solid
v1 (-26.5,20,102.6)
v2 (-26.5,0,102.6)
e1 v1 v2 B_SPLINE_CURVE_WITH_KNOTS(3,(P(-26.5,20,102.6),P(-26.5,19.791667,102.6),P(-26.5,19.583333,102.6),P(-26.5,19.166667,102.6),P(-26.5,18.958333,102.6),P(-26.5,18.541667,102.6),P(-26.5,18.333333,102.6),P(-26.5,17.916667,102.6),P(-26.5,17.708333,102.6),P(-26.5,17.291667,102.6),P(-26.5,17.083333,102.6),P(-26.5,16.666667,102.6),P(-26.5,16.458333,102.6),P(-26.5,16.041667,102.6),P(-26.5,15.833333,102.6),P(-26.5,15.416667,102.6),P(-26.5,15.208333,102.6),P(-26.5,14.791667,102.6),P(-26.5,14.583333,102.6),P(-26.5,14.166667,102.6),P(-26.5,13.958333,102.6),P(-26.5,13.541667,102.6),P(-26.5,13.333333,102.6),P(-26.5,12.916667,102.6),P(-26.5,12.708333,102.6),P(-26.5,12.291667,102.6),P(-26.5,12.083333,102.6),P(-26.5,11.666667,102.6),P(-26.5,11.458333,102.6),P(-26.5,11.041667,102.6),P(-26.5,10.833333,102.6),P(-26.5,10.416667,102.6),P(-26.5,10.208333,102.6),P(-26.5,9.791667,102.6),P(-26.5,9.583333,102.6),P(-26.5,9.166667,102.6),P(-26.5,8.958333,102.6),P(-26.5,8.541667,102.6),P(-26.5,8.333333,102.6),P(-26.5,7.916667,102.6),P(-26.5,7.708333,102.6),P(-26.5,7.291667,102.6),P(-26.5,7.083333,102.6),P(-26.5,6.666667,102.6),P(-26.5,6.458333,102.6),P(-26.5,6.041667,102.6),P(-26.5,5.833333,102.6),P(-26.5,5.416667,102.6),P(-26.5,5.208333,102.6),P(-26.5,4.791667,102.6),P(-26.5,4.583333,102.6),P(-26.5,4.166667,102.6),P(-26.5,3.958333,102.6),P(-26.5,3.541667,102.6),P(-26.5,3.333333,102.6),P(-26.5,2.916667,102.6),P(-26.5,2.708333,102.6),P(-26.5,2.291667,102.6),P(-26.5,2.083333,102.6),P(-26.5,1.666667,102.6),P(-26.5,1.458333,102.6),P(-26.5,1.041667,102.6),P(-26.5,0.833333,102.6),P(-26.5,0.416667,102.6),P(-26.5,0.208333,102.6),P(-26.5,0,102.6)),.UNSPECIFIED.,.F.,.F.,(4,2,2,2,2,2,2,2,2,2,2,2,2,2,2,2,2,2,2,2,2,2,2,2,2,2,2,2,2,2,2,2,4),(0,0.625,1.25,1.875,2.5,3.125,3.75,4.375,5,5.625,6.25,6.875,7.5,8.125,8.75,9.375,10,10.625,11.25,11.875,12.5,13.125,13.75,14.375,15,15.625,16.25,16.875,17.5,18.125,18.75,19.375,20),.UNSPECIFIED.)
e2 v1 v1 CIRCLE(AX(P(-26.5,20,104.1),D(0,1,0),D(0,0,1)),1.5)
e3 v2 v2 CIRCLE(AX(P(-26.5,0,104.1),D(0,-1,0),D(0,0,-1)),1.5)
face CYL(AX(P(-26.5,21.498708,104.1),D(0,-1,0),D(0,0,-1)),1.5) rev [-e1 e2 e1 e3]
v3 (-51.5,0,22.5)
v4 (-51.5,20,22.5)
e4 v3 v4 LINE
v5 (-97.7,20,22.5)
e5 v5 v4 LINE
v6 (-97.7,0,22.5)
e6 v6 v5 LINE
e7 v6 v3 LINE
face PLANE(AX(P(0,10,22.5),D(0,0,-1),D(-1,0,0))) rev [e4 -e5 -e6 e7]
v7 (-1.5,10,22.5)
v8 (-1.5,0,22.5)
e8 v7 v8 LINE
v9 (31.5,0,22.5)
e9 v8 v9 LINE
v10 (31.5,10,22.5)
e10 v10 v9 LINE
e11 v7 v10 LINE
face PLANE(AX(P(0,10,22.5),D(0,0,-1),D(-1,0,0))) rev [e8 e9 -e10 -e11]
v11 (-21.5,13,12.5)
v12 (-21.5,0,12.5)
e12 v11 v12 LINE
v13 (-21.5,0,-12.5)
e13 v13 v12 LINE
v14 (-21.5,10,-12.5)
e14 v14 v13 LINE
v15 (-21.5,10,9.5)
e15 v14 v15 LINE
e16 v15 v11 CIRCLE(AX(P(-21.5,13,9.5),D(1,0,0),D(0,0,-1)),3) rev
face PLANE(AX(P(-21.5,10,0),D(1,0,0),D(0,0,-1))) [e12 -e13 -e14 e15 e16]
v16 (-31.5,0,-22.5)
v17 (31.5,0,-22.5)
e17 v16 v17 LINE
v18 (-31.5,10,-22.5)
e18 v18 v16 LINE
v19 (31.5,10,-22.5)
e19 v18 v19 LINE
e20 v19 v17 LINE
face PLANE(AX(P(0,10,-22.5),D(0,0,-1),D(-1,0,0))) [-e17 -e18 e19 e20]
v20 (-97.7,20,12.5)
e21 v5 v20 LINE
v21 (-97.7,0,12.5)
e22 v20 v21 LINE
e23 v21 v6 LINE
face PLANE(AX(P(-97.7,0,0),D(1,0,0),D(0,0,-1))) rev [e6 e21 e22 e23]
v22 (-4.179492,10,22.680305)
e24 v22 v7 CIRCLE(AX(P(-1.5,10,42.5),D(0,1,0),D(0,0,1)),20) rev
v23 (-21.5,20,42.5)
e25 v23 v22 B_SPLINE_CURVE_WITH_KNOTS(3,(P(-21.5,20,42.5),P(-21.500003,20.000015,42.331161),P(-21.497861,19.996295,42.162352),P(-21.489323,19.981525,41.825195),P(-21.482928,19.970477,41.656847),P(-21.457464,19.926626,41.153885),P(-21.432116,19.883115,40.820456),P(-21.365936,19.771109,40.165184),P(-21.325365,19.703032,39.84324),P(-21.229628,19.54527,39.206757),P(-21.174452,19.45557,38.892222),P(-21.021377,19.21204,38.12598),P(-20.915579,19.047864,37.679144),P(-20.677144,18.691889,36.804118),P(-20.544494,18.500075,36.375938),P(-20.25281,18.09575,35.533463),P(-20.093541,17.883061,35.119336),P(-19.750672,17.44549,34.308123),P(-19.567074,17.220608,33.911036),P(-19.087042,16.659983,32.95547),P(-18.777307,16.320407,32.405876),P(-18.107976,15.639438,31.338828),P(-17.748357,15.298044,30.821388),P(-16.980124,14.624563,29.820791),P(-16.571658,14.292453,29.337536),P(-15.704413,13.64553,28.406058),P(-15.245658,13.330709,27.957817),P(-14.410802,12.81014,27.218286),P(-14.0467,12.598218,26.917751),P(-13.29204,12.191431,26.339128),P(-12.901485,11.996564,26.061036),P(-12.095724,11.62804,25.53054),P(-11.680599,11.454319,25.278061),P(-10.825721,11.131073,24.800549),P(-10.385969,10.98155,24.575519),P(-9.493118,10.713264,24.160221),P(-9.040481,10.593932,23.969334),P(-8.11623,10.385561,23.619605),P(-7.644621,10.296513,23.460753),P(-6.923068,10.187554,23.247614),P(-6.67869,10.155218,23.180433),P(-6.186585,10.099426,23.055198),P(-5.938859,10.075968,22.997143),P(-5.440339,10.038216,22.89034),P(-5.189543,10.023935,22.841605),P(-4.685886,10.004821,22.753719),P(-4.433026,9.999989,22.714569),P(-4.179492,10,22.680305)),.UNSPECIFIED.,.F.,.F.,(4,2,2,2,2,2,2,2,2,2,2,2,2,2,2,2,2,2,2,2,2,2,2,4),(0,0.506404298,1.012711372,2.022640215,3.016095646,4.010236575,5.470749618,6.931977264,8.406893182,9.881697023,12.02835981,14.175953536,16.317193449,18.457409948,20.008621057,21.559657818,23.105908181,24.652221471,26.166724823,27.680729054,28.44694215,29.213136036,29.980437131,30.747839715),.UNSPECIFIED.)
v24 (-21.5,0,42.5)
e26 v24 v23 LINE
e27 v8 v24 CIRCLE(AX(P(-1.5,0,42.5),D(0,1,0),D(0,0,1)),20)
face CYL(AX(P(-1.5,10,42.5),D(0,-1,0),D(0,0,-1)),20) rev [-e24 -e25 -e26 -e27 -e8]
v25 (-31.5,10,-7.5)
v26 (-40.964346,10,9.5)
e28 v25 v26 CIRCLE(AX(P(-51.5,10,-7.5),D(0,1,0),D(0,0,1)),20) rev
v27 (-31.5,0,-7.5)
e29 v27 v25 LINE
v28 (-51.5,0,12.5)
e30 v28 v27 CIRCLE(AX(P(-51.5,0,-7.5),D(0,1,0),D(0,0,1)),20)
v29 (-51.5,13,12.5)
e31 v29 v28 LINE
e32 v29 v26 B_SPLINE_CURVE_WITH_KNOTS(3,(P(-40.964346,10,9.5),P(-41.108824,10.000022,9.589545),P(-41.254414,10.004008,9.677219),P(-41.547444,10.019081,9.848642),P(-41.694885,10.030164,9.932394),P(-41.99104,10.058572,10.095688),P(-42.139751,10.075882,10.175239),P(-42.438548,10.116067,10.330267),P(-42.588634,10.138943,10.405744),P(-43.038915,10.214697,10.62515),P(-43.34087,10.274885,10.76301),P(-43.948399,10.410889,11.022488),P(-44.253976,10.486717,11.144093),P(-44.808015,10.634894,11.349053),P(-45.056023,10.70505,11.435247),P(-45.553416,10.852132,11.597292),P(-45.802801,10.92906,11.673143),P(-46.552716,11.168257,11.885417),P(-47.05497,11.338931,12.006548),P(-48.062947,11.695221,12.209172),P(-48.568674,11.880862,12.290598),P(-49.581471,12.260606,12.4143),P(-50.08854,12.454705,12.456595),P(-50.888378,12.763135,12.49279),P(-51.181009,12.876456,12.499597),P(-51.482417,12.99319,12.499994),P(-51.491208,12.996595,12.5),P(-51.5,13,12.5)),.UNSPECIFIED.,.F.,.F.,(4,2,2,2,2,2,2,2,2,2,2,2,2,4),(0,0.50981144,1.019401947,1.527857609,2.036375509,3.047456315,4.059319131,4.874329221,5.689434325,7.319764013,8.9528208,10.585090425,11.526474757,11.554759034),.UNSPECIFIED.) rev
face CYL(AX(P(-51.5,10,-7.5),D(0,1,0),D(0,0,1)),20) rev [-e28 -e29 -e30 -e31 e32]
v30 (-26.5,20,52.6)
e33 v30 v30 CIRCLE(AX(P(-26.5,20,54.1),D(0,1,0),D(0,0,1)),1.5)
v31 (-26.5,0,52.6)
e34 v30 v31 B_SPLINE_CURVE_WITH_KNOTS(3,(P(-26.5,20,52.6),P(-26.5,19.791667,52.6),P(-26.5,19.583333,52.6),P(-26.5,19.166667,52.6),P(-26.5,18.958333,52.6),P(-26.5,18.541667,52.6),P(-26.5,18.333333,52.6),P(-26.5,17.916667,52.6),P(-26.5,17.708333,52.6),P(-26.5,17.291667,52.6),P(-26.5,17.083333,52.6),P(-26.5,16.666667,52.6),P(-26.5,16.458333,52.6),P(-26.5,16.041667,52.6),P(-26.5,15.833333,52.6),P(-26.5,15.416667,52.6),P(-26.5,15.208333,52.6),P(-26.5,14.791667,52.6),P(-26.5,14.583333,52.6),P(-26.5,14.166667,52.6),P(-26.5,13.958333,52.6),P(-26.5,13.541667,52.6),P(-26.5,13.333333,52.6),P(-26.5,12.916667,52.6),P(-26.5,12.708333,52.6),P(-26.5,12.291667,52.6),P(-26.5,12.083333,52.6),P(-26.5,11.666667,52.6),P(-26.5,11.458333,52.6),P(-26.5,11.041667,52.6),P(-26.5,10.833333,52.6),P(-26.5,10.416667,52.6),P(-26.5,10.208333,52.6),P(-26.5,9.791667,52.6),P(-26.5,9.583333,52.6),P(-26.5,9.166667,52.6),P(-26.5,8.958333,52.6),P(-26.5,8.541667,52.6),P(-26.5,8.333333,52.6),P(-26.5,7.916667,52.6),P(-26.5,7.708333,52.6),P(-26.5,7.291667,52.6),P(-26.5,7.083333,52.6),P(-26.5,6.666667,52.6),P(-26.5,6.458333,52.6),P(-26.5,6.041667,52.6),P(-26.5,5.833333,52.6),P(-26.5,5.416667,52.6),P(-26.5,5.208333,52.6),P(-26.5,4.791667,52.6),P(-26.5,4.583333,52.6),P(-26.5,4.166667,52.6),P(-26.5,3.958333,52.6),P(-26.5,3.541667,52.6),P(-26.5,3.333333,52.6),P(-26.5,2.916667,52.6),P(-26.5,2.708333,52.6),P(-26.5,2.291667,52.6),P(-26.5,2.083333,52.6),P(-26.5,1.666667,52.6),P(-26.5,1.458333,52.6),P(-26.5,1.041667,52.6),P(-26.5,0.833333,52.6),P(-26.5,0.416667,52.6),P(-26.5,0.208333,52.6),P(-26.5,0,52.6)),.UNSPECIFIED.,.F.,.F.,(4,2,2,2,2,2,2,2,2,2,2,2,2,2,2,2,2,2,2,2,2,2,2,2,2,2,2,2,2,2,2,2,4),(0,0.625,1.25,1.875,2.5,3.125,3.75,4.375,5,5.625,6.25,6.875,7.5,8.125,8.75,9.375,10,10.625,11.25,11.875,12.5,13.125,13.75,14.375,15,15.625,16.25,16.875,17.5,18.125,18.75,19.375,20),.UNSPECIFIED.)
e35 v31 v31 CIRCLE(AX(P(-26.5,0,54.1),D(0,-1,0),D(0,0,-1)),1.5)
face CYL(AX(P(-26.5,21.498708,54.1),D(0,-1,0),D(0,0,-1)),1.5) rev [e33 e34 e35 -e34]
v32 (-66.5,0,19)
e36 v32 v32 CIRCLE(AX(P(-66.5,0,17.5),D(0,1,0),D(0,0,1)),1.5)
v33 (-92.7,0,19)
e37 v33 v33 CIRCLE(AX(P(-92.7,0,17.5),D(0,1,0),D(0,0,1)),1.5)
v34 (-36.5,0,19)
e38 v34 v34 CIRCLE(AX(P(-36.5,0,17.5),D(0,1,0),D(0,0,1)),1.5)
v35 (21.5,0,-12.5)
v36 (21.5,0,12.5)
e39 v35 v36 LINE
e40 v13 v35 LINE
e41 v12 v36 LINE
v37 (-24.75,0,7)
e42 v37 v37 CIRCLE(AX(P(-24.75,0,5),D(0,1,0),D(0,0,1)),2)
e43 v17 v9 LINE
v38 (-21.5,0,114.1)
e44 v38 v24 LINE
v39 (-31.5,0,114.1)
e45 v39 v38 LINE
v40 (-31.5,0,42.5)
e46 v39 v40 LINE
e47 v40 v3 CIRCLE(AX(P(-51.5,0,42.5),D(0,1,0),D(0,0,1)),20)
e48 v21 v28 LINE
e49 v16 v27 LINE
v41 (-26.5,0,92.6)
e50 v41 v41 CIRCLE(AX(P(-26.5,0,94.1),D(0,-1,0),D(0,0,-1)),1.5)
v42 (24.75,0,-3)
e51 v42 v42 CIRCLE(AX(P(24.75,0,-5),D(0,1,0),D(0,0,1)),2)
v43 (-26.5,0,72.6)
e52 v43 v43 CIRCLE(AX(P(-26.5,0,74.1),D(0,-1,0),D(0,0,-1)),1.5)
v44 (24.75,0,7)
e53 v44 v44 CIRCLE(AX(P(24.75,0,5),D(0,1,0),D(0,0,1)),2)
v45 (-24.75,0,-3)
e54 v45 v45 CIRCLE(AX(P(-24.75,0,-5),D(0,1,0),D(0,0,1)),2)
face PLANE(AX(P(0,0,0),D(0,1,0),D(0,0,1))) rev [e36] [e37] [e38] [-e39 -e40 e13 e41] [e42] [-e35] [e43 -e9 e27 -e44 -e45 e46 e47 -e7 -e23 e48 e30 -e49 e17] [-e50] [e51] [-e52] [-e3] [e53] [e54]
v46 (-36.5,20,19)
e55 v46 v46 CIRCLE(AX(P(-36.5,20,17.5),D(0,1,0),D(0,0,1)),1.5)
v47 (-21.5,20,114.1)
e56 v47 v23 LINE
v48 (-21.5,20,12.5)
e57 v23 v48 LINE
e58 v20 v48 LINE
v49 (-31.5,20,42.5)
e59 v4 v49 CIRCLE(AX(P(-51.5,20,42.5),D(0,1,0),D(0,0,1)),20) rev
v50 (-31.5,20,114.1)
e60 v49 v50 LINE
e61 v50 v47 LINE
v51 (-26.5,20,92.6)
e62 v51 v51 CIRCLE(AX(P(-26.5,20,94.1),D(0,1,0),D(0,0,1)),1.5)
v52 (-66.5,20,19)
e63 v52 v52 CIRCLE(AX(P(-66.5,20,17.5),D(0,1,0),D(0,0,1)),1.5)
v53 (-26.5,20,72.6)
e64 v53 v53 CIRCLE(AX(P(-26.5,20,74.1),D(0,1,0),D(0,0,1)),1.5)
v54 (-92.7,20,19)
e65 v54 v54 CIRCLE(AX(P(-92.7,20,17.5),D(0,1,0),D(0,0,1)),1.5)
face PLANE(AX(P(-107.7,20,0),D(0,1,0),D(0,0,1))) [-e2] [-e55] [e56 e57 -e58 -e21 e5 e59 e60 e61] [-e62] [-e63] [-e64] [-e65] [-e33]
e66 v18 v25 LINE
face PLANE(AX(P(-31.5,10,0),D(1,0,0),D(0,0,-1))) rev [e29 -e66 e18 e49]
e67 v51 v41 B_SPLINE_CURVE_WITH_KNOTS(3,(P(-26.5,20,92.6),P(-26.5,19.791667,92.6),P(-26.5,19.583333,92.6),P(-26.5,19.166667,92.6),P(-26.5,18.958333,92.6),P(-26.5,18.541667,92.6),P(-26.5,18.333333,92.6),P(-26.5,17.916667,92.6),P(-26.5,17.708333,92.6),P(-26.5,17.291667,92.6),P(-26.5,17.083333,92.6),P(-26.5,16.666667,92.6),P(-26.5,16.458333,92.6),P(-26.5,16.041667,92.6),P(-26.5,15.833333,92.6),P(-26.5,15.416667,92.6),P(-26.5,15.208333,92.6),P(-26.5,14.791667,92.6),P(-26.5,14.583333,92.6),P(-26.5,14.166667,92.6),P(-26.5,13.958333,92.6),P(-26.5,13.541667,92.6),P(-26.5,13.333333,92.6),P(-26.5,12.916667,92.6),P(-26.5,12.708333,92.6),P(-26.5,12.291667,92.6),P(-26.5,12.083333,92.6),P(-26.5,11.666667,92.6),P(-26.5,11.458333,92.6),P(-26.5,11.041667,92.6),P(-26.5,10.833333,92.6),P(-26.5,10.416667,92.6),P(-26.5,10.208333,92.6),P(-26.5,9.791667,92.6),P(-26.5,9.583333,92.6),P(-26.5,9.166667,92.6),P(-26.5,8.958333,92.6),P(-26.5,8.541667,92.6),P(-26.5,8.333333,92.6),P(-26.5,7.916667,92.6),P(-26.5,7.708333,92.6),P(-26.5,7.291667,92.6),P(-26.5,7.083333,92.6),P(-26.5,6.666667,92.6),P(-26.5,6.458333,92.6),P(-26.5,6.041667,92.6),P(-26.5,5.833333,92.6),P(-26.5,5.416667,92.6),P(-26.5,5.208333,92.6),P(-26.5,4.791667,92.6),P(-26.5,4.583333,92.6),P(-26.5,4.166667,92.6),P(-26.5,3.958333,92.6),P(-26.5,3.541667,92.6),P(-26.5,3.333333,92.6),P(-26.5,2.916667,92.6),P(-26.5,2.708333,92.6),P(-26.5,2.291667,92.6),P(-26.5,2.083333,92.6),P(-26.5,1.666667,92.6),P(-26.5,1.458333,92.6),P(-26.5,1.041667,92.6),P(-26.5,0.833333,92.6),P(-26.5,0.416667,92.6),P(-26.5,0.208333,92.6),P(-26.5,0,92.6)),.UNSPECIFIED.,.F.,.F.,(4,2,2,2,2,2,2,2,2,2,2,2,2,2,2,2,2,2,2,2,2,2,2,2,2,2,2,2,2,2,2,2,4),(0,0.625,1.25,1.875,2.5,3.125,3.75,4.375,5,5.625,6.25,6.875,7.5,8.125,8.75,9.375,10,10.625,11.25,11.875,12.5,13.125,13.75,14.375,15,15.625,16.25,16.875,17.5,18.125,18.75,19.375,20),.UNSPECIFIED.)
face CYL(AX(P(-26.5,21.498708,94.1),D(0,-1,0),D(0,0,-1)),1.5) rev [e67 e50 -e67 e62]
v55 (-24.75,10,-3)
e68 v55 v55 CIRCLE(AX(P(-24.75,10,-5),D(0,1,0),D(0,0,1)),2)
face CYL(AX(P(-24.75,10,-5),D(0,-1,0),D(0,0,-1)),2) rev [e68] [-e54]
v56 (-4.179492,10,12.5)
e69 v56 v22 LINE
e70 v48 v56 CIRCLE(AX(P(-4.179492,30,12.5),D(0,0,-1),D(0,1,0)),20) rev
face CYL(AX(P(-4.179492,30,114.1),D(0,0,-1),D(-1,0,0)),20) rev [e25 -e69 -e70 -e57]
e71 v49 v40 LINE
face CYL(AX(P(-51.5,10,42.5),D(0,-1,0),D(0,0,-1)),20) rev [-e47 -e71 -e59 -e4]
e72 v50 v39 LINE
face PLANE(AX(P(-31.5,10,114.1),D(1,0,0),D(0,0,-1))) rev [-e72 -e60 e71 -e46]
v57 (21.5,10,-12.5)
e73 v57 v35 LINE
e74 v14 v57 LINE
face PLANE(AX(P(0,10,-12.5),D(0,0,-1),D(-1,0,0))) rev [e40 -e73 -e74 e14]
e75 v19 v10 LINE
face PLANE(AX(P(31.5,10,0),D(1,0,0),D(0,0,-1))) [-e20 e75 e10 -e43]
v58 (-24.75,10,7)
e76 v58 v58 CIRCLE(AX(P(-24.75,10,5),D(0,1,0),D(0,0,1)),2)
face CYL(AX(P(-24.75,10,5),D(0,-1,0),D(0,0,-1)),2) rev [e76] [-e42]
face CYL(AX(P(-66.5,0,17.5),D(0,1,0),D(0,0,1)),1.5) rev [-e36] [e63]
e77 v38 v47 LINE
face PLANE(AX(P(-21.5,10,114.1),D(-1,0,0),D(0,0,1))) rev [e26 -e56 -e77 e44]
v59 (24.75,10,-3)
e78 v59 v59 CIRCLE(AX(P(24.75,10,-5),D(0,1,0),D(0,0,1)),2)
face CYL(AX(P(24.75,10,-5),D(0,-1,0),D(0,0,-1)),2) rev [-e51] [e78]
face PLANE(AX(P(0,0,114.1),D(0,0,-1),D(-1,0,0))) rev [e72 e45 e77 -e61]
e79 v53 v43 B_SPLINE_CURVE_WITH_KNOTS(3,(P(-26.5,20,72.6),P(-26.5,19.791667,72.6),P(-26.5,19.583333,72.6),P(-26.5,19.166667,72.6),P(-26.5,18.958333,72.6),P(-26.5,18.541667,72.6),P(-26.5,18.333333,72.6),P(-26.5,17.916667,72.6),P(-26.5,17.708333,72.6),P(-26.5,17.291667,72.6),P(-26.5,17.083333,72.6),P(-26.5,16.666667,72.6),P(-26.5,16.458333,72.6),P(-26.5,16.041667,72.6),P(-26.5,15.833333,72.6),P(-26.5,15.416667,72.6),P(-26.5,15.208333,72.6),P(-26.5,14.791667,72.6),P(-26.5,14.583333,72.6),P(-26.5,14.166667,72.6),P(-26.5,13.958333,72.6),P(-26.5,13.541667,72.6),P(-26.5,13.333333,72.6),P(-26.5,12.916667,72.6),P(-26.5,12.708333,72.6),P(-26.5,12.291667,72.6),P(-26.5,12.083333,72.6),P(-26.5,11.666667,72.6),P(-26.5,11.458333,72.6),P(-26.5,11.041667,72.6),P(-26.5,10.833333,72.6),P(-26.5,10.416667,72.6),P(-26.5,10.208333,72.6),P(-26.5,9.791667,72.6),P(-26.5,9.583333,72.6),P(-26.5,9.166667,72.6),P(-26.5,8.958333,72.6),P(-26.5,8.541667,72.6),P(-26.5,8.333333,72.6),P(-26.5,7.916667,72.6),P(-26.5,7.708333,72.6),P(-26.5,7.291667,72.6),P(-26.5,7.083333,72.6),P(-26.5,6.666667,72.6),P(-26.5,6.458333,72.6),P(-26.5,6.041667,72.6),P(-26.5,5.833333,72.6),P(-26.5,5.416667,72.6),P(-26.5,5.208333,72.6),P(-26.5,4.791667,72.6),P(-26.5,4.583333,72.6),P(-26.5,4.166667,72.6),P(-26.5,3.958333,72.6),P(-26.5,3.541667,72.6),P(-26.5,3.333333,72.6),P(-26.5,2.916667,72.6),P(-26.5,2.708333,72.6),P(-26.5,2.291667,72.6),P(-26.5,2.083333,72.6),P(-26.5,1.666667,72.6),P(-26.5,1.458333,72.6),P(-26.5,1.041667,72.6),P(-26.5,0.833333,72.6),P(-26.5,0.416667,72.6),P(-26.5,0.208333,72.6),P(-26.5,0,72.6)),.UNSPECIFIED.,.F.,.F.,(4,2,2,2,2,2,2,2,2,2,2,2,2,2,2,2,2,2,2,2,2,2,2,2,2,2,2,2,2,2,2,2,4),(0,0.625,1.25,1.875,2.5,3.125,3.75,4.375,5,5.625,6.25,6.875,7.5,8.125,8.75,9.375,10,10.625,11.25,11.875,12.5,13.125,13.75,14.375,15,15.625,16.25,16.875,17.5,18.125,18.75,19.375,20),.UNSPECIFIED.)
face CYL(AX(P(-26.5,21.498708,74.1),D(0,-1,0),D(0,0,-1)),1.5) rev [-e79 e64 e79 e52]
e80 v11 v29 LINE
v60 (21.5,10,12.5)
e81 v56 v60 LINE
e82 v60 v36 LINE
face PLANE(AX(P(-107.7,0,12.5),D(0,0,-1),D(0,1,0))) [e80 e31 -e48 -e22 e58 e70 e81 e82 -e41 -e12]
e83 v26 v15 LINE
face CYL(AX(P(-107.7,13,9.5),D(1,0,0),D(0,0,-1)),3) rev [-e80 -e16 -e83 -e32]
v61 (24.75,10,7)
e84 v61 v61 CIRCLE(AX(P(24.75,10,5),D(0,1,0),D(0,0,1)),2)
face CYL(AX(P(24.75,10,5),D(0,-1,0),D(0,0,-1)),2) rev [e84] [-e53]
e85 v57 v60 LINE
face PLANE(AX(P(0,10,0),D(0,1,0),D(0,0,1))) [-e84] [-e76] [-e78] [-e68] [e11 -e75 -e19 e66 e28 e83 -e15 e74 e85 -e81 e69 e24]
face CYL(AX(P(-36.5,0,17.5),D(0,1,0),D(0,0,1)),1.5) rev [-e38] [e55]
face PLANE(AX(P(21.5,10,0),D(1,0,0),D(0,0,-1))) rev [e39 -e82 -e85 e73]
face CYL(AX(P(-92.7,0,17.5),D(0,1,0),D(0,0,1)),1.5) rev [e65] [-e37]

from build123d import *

# Parameters (mm, degrees)
SKETCH1_W               = 63
SKETCH1_H               = 45
SKETCH1_R               = 2
SKETCH1_W_2             = 43
SKETCH1_H_2             = 25
BOSS_EXTRUDE1_DEPTH     = 10
SKETCH2_W               = 10
SKETCH2_H               = 20
BOSS_EXTRUDE2_DEPTH     = 76.2
SKETCH3_W               = 10
SKETCH3_H               = 10
BOSS_EXTRUDE3_DEPTH     = 91.6
SKETCH5_W               = 10
SKETCH5_H               = 101.6
BOSS_EXTRUDE4_DEPTH     = 10
CUT_EXTRUDE1_DEPTH      = 158.219909681
CUT_EXTRUDE1_DEPTH_BACK = 158.219909681
SKETCH4_R               = 1.5
FILLET5_R               = 20
FILLET7_R               = 20
FILLET8_R               = 3
FILLET9_START           = 22.5
FILLET9_DEPTH           = 20.0000001
FILLET9_START_2         = 10
FILLET9_2_DEPTH         = 11
FILLET9_3_DEPTH         = 10
SKETCH6_W               = 10
SKETCH6_H               = 20
CUT_EXTRUDE2_DEPTH      = 10
SKETCH7_R               = 1.5
CUT_EXTRUDE3_DEPTH      = 152.539104801


with BuildPart() as part:
    # Sketch1 → Boss-Extrude1 (new body)
    with BuildSketch(Plane(origin=(0, 0, 0), x_dir=(1, 0, 0), z_dir=(0, 1, 0))):
        Rectangle(SKETCH1_W, SKETCH1_H)
        with Locations(Location((-24.75, 5, 0), (0, 0, 270))):
            Circle(SKETCH1_R, mode=Mode.SUBTRACT)
        with Locations(Location((-24.75, -5, 0), (0, 0, 270))):
            Circle(SKETCH1_R, mode=Mode.SUBTRACT)
        with Locations(Location((24.75, 5, 0), (0, 0, 270))):
            Circle(SKETCH1_R, mode=Mode.SUBTRACT)
        with Locations(Location((24.75, -5, 0), (0, 0, 270))):
            Circle(SKETCH1_R, mode=Mode.SUBTRACT)
        Rectangle(SKETCH1_W_2, SKETCH1_H_2, mode=Mode.SUBTRACT)
    extrude(amount=BOSS_EXTRUDE1_DEPTH)

    # Sketch2 → Boss-Extrude2 (add)
    with BuildSketch(Plane.ZY.offset(31.5)):
        with Locations((17.5, 10)):
            Rectangle(SKETCH2_W, SKETCH2_H)
    extrude(amount=BOSS_EXTRUDE2_DEPTH)

    # Sketch3 → Boss-Extrude3 (add)
    with BuildSketch(Plane.XY.offset(22.5)):
        with Locations((-26.5, 5)):
            Rectangle(SKETCH3_W, SKETCH3_H)
    extrude(amount=BOSS_EXTRUDE3_DEPTH)

    # Sketch5 → Boss-Extrude4 (add)
    with BuildSketch(Plane(origin=(0, 10, 0), x_dir=(1, 0, 0), z_dir=(0, 1, 0))):
        with Locations((-26.5, -63.3)):
            Rectangle(SKETCH5_W, SKETCH5_H)
    extrude(amount=BOSS_EXTRUDE4_DEPTH)

    # Sketch4 → Cut-Extrude1 (cut, two sides: drawn at the far end of the back side and taken through both)
    with BuildSketch(Plane(origin=(0, 10, 0), x_dir=(1, 0, 0), z_dir=(0, 1, 0)).offset(-CUT_EXTRUDE1_DEPTH_BACK)):
        with BuildLine():
            ThreePointArc((-91.2, -17.5), (-92.7, -16), (-94.2, -17.5))
            Line((-94.2, -17.5), (-91.2, -17.5))
        make_face()
        with BuildLine():
            Line((-91.2, -17.5), (-94.2, -17.5))
            ThreePointArc((-94.2, -17.5), (-92.7, -19), (-91.2, -17.5))
        make_face()
        with Locations(Location((-66.5, -17.5, 0), (0, 0, 270))):
            Circle(SKETCH4_R)
        with Locations(Location((-36.5, -17.5, 0), (0, 0, 270))):
            Circle(SKETCH4_R)
    extrude(amount=CUT_EXTRUDE1_DEPTH + CUT_EXTRUDE1_DEPTH_BACK, mode=Mode.SUBTRACT)

    # Fillet5
    fillet5_edges = [part.edges().sort_by_distance(p)[0] for p in [
        (-31.5, 5, 12.5),
        (-31.5, 10, 22.5),
    ]]
    fillet(fillet5_edges, radius=FILLET5_R)

    # Fillet7
    # the kernel refuses this fillet: 20 mm, written as the material it adds along each edge
    with BuildSketch(Plane(origin=(-21.5, 10, 12.5), x_dir=(1, 0, 0), z_dir=(0, 0, 1))) as fillet7_piece_1:
        with BuildLine():
            CenterArc((17.320508076, 20), FILLET7_R, 210, 60)
            Line((0, 10), (-0.346410162, 9.8))
            ThreePointArc((-0.346410162, 9.8), (-0.4, 5), (-0.4, 0))
            Line((-0.4, 0), (0, -0.4))
            Line((0, -0.4), (17.320508076, -0.4))
            Line((17.320508076, -0.4), (17.320508076, 0))
        make_face()
    extrude(amount=10)

    # Fillet8
    fillet8_edges = [part.edges().sort_by_distance(p)[0] for p in [
        (-36.5, 10, 12.5),
    ]]
    fillet(fillet8_edges, radius=FILLET8_R)

    # Fillet9: read off the stored shape, not the designer's step
    # Fillet9 outline → Fillet9 (add)
    with BuildSketch(Plane.XY.offset(FILLET9_START)):
        with BuildLine():
            Line((-21.5, 10), (-4.179491924, 10))
            ThreePointArc((-4.179491924, 10), (-14.179495423, 12.679493944), (-21.50000404, 20.000006998))
            Line((-21.50000404, 20.000006998), (-21.5, 10))
        make_face()
    extrude(amount=FILLET9_DEPTH)

    # Fillet9 2 outline → Fillet9 2 (cut)
    with BuildSketch(Plane(origin=(0, 0, 0), x_dir=(1, 0, 0), z_dir=(0, 1, 0)).offset(FILLET9_START_2)):
        with BuildLine():
            ThreePointArc((-1.5, -22.5), (-15.642135624, -28.357864376), (-21.5, -42.5))
            Line((-21.5, -42.5), (0, -42.5000001))
            Line((0, -42.5000001), (0, -22.5))
            Line((0, -22.5), (-1.5, -22.5))
        make_face()
    extrude(amount=FILLET9_2_DEPTH, mode=Mode.SUBTRACT)

    # Fillet9 3 outline → Fillet9 3 (add)
    with BuildSketch(Plane(origin=(0, 0, 0), x_dir=(1, 0, 0), z_dir=(0, 1, 0))):
        with BuildLine():
            Line((-21.5, -22.5), (-21.5, -42.5))
            ThreePointArc((-21.5, -42.5), (-15.642135624, -28.357864376), (-1.5, -22.5))
            Line((-1.5, -22.5), (-21.5, -22.5))
        make_face()
    extrude(amount=FILLET9_3_DEPTH)

    # Sketch6 → Cut-Extrude2 (cut)
    with BuildSketch(Plane.ZY.offset(107.7)):
        with Locations((17.5, 10)):
            Rectangle(SKETCH6_W, SKETCH6_H)
    extrude(amount=-CUT_EXTRUDE2_DEPTH, mode=Mode.SUBTRACT)

    # Sketch7 → Cut-Extrude3 (cut, through all)
    with BuildSketch(Plane(origin=(0, 0, 0), x_dir=(-1, 0, 0), z_dir=(0, -1, 0))):
        with Locations(Location((26.5, -54.1, 0), (0, 0, 90))):
            Circle(SKETCH7_R)
        with Locations(Location((26.5, -94.1, 0), (0, 0, 90))):
            Circle(SKETCH7_R)
        with Locations(Location((26.5, -74.1, 0), (0, 0, 90))):
            Circle(SKETCH7_R)
        with Locations(Location((26.5, -104.1, 0), (0, 0, 90))):
            Circle(SKETCH7_R)
    extrude(amount=-CUT_EXTRUDE3_DEPTH, mode=Mode.SUBTRACT)


solid = part.part
